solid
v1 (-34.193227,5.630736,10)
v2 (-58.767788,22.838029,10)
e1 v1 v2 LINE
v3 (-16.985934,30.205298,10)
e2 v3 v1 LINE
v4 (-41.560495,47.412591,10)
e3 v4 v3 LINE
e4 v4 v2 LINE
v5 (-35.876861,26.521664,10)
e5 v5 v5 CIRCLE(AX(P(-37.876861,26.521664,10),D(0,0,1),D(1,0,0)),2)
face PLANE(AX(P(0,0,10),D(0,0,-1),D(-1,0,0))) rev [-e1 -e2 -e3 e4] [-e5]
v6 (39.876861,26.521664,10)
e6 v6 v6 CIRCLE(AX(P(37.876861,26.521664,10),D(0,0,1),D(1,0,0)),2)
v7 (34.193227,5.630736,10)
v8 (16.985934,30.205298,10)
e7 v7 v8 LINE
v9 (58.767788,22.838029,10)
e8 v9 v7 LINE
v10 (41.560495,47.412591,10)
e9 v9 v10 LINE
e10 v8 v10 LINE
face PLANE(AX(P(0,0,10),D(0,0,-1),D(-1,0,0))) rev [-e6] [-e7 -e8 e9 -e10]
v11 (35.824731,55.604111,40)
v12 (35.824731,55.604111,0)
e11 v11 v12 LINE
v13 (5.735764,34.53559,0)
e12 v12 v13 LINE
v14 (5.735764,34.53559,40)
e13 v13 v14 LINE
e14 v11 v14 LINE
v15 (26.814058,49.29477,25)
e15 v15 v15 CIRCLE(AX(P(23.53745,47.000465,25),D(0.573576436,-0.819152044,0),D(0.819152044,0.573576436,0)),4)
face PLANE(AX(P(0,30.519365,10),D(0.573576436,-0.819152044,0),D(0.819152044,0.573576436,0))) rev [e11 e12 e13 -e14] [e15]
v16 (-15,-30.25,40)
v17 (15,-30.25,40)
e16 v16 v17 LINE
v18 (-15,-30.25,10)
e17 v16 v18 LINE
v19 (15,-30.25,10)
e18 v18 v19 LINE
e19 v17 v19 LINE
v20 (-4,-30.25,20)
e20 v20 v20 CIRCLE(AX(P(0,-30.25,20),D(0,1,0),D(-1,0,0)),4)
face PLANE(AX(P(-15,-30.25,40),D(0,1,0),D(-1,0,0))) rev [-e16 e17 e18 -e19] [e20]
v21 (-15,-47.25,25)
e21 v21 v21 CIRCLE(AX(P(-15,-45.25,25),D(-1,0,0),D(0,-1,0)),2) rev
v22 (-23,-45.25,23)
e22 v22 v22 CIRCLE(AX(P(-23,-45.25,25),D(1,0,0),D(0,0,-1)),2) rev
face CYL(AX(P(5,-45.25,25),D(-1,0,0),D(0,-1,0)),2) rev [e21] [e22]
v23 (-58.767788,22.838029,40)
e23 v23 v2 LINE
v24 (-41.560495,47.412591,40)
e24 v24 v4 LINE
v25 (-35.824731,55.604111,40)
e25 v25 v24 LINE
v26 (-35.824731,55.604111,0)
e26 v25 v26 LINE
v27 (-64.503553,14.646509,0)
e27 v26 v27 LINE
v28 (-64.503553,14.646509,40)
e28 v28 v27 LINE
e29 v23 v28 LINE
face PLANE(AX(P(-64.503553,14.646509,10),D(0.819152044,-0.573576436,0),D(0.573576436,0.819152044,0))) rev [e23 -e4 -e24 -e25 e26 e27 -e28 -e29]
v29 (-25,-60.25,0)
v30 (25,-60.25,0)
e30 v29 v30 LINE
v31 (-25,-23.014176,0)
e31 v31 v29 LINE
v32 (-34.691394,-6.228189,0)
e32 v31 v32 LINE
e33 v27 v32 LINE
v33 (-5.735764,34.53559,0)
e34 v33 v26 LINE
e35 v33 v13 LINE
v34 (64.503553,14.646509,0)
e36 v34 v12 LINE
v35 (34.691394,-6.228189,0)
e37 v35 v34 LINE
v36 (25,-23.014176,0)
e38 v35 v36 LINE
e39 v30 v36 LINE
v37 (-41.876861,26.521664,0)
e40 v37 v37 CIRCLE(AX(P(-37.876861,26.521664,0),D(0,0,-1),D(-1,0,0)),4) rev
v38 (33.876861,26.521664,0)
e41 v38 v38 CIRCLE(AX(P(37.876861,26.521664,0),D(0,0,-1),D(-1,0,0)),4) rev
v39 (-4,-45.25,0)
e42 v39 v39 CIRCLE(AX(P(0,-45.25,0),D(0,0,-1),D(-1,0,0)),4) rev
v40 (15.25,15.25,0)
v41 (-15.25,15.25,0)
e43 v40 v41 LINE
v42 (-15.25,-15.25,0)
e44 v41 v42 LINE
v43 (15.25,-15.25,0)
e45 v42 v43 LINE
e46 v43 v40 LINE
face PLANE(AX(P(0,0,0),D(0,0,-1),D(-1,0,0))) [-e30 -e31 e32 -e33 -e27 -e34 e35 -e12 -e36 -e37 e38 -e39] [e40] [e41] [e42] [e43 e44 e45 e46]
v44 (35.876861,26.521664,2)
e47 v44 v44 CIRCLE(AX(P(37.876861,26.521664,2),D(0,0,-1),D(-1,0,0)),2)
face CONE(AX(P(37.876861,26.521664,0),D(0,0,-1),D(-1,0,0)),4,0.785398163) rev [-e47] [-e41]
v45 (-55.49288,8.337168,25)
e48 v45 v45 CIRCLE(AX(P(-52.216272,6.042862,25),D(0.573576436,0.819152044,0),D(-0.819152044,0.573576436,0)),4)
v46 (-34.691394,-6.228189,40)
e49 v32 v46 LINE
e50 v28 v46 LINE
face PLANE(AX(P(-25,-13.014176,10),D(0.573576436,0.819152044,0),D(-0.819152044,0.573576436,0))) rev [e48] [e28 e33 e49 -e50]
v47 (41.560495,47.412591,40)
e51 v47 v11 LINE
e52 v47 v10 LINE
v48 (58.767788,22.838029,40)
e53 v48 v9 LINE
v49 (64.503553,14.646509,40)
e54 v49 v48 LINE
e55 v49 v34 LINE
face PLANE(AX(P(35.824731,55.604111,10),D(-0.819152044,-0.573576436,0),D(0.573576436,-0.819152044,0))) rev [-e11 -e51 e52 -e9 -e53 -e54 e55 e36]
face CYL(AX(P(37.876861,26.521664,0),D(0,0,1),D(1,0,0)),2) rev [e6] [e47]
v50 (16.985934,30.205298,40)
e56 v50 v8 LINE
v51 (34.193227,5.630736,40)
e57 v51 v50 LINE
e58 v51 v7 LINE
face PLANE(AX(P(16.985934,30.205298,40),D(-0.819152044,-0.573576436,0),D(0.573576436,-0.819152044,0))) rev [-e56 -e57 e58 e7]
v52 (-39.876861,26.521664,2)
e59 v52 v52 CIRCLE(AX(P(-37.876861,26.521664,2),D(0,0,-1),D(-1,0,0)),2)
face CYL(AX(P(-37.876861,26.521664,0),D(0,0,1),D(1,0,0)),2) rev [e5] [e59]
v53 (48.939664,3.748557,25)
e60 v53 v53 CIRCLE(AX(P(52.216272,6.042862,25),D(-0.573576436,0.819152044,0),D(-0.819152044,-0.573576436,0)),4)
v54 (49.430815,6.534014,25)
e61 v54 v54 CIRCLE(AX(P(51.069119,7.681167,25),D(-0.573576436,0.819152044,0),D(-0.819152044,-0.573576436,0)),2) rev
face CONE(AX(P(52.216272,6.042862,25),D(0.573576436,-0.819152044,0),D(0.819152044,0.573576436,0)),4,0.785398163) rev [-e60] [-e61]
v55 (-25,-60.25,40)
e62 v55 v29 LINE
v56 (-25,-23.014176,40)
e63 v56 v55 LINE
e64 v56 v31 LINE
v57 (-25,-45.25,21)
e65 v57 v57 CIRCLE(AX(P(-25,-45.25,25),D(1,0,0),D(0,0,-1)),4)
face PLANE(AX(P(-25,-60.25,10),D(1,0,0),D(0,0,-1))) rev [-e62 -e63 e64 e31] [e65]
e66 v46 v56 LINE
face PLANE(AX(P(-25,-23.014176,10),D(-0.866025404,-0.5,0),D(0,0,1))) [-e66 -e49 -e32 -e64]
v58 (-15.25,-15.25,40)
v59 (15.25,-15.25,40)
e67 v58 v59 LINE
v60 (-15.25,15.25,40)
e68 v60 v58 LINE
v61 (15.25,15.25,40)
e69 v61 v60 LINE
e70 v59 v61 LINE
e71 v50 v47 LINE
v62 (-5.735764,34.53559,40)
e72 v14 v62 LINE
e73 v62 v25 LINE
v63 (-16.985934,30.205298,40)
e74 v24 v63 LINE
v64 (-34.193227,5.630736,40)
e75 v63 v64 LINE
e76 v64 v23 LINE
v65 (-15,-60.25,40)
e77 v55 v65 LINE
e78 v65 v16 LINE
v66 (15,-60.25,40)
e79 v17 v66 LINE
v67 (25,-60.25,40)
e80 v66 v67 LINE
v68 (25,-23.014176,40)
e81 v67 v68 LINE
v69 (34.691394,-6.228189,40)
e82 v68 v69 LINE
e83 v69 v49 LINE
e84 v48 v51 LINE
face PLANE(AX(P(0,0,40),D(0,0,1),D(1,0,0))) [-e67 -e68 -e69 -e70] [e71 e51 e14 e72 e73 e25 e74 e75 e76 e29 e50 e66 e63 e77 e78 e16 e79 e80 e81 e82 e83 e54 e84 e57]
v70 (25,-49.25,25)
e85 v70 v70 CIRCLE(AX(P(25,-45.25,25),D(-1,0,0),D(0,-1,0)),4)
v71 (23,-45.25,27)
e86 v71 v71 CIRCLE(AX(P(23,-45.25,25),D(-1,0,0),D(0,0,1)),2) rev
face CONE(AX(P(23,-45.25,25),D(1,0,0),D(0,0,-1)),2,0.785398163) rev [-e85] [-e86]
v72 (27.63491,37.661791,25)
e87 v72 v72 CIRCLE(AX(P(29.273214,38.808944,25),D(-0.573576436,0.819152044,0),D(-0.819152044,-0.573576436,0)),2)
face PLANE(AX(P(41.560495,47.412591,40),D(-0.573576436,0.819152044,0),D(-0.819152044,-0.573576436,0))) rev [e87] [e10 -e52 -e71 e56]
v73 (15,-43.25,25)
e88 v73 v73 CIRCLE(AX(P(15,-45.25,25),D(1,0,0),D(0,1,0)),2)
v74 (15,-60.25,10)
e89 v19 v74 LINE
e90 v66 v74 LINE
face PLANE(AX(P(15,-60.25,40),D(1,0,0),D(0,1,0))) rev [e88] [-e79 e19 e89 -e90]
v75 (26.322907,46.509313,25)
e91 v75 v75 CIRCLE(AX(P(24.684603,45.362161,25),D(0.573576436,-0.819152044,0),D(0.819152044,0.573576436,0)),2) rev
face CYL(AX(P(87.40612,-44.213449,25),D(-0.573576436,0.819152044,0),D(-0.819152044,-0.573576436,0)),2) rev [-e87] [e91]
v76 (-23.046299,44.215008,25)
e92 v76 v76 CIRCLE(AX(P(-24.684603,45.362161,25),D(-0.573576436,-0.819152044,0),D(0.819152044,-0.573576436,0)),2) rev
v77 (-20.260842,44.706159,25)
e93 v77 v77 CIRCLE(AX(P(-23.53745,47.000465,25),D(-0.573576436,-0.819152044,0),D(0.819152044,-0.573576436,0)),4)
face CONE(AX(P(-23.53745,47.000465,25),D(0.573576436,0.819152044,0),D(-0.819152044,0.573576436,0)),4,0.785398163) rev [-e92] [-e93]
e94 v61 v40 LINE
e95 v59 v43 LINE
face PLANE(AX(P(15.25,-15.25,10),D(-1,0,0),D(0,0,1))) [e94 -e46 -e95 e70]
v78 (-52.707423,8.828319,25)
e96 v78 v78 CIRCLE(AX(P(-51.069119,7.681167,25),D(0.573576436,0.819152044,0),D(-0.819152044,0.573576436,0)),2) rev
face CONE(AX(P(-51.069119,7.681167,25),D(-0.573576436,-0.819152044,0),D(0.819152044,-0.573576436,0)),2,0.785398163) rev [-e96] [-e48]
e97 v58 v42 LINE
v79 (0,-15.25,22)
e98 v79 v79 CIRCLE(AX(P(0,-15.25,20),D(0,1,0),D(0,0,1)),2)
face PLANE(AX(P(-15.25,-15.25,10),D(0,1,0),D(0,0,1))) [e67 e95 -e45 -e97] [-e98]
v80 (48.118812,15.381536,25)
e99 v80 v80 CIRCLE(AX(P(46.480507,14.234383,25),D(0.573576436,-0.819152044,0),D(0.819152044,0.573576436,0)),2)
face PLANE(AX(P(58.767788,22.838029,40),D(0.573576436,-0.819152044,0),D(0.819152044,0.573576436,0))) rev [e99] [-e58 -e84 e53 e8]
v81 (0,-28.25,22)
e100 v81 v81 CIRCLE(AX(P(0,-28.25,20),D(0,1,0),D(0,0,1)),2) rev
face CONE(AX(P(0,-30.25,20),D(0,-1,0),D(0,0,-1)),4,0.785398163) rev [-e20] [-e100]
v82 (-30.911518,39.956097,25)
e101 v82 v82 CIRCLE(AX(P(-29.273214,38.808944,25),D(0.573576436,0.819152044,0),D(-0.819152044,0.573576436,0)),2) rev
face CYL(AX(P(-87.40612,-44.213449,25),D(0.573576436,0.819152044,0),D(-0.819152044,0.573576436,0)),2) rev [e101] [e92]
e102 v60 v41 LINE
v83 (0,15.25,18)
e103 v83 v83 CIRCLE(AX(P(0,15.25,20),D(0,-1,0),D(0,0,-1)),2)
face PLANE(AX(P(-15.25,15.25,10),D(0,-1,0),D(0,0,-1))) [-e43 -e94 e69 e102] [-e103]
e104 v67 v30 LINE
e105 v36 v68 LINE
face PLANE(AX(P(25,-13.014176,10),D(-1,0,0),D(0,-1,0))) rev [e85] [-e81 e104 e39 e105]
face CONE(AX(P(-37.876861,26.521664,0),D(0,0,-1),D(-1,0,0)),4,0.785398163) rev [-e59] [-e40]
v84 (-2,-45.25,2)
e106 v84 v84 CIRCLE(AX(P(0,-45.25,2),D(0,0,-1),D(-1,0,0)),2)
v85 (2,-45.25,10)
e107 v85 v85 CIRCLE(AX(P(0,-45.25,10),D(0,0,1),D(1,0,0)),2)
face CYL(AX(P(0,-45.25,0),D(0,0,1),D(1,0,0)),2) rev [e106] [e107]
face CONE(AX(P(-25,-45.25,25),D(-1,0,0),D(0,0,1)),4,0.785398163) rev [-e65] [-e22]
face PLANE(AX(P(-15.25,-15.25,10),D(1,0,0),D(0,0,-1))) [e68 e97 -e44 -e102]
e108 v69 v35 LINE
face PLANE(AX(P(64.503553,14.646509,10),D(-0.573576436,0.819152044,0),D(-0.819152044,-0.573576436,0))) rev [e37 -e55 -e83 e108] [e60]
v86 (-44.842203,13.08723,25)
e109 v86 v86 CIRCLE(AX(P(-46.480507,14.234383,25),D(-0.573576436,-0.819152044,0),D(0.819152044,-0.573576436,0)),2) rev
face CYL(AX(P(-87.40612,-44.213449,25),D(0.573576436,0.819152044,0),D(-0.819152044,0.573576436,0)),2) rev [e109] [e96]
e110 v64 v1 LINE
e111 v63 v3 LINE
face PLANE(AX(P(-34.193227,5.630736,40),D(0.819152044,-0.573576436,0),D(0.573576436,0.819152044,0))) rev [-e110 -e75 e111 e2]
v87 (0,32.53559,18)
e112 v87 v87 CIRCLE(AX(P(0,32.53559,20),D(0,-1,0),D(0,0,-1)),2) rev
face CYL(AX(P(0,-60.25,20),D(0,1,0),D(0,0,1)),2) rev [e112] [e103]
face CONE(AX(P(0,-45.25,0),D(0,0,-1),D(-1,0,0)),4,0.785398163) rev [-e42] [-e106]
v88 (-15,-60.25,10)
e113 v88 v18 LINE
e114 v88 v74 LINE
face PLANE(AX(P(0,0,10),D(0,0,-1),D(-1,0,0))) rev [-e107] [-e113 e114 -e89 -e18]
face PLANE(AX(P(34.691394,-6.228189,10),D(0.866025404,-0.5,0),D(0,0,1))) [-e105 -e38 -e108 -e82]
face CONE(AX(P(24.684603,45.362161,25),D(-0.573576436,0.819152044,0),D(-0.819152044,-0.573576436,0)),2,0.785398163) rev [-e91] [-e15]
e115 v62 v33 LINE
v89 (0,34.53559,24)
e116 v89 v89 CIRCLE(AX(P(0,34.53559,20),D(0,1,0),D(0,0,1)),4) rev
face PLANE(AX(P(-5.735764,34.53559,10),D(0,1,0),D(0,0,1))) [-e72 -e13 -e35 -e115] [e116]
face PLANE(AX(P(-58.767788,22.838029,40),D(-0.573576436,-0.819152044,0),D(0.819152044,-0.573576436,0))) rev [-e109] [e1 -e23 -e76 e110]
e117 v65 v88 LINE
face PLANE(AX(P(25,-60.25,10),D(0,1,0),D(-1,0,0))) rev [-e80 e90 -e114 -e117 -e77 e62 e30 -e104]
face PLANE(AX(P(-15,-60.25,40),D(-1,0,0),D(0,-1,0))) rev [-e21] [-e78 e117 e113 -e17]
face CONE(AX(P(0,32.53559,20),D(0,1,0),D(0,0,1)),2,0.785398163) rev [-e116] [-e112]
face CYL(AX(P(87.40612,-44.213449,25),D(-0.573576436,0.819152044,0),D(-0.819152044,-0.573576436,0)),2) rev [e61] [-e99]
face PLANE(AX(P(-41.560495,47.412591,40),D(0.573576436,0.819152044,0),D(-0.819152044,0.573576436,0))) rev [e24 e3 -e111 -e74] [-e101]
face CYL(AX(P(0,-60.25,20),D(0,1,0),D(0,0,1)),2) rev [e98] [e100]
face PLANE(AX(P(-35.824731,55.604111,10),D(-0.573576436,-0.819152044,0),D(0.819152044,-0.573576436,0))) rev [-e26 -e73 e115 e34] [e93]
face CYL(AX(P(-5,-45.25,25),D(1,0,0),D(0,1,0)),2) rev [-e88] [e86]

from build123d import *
from OCP.BRepFilletAPI import BRepFilletAPI_MakeChamfer

# Parameters (mm, degrees)
SKETCH1_W           = 30.5
SKETCH1_H           = 30.5
BOSS_EXTRUDE1_DEPTH = 10
SKETCH2_W           = 30.5
SKETCH2_H           = 30.5
BOSS_EXTRUDE2_DEPTH = 30
CHAMFER1_SIZE       = 10
CHAMFER1_SIZE2      = 11.831007916
SKETCH3_R           = 2
CUT_EXTRUDE1_DEPTH  = 94.224303623
SKETCH4_R           = 2
CUT_EXTRUDE2_DEPTH  = 120.721978802
SKETCH5_R           = 2
CUT_EXTRUDE3_DEPTH  = 30
SKETCH6_R           = 2
CUT_EXTRUDE4_DEPTH  = 122.429059078
CHAMFER3_SIZE       = 2


with BuildPart() as part:
    # Sketch1 → Boss-Extrude1 (new body)
    with BuildSketch(Plane.XY):
        Polygon((-25, -60.25), (-25, -13.014176264), (-64.503552507, 14.646508987), (-35.824730689, 55.604111202), (0, 30.519364719), (35.824730689, 55.604111202), (64.503552507, 14.646508987), (25, -13.014176264), (25, -60.25), align=None)
        Rectangle(SKETCH1_W, SKETCH1_H, mode=Mode.SUBTRACT)
    extrude(amount=BOSS_EXTRUDE1_DEPTH)

    # Sketch2 → Boss-Extrude2 (add)
    with BuildSketch(Plane.XY.offset(10)):
        Polygon((-58.767788143, 22.83802943), (-34.193226815, 5.63073634), (-16.985933724, 30.205297668), (-41.560495053, 47.412590759), (-35.824730689, 55.604111202), (0, 30.519364719), (35.824730689, 55.604111202), (41.560495053, 47.412590759), (16.985933724, 30.205297668), (34.193226815, 5.63073634), (58.767788143, 22.83802943), (64.503552507, 14.646508987), (25, -13.014176264), (25, -60.25), (15, -60.25), (15, -30.25), (-15, -30.25), (-15, -60.25), (-25, -60.25), (-25, -13.014176264), (-64.503552507, 14.646508987), align=None)
        Rectangle(SKETCH2_W, SKETCH2_H, mode=Mode.SUBTRACT)
    extrude(amount=BOSS_EXTRUDE2_DEPTH)

    # Chamfer1: one chamfer whose edges measure the first distance from different faces: ONE call of the kernel's chamfer builder (chamfer() names one face for all edges)
    chamfer1_edges_1 = [part.edges().sort_by_distance(p)[0] for p in [
        (-25, -13.014176264, 20),
    ]]
    chamfer1_side_1 = [part.faces().sort_by_distance(p)[0] for p in [
        (-25, -36.632088132, 20),
    ]]
    chamfer1_edges_2 = [part.edges().sort_by_distance(p)[0] for p in [
        (25, -13.014176264, 20),
    ]]
    chamfer1_side_2 = [part.faces().sort_by_distance(p)[0] for p in [
        (25, -36.632088132, 20),
    ]]
    chamfer1 = BRepFilletAPI_MakeChamfer(part.part.solid().wrapped)
    for e in chamfer1_edges_1:
        chamfer1.Add(CHAMFER1_SIZE, CHAMFER1_SIZE2, e.wrapped, chamfer1_side_1[0].wrapped)  # the first distance lies on this face
    for e in chamfer1_edges_2:
        chamfer1.Add(CHAMFER1_SIZE, CHAMFER1_SIZE2, e.wrapped, chamfer1_side_2[0].wrapped)  # the first distance lies on this face
    add(Compound.cast(chamfer1.Shape()), mode=Mode.REPLACE)

    # Chamfer2
    # the kernel refuses this chamfer: 10 mm, written as the material it adds along each edge
    with BuildSketch(Plane(origin=(0, 30.519364719, 40), x_dir=(0.8366959699781049, 0.5476676490558834, 0), z_dir=(0, 0, -1))) as chamfer2_piece_1:
        with BuildLine():
            Line((7.333326063, 0), (-2.934212568, -6.720719288))
            Line((-2.934212568, -6.720719288), (-3.119919002, -6.646468897))
            ThreePointArc((-3.119919002, -6.646468897), (-1.546295883, -3.328697528), (-0.185706433, 0.074250391))
            Line((-0.185706433, 0.074250391), (0.006257204, 0.199902095))
            ThreePointArc((0.006257204, 0.199902095), (3.669331251, 0.085242964), (7.339583267, 0.199902095))
            Line((7.339583267, 0.199902095), (7.333326063, 0))
        make_face()
    extrude(amount=40)

    # Sketch3 → Cut-Extrude1 (cut, through all)
    with BuildSketch(Plane.XY.offset(10)):
        with Locations((37.876860934, 26.521663549)):
            Circle(SKETCH3_R)
        with Locations((0, -45.25)):
            Circle(SKETCH3_R)
        with Locations((-37.876860934, 26.521663549)):
            Circle(SKETCH3_R)
    extrude(amount=-CUT_EXTRUDE1_DEPTH, mode=Mode.SUBTRACT)

    # Sketch4 → Cut-Extrude2 (cut, through all)
    with BuildSketch(Plane(origin=(-14.339410909, 20.478801107, 0), x_dir=(0.819152044288991, 0.5735764363510474, 0), z_dir=(-0.5735764363510474, 0.819152044288991, 0))):
        with Locations(Location((46.23910933, -25, 0), (0, 0, 180))):
            Circle(SKETCH4_R)
    cut_extrude2 = extrude(amount=-CUT_EXTRUDE2_DEPTH, mode=Mode.SUBTRACT)

    # Sketch5 → Cut-Extrude3 (cut)
    with BuildSketch(Plane(origin=(25, 0, 0), x_dir=(0, 0, -1), z_dir=(1, 0, 0))):
        with Locations(Location((-25, -45.25, 0), (0, 0, 90))):
            Circle(SKETCH5_R)
    cut_extrude3 = extrude(amount=-CUT_EXTRUDE3_DEPTH, mode=Mode.SUBTRACT)

    # Mirror1: Cut-Extrude2, Cut-Extrude3 across plane
    add(cut_extrude2.mirror(Plane(origin=(0, 0, 0), x_dir=(0, 0, 1), z_dir=(1, 0, 0))), mode=Mode.SUBTRACT)
    add(cut_extrude3.mirror(Plane(origin=(0, 0, 0), x_dir=(0, 0, 1), z_dir=(1, 0, 0))), mode=Mode.SUBTRACT)

    # Sketch6 → Cut-Extrude4 (cut, through all)
    with BuildSketch(Plane(origin=(0, 34.535590164, 0), x_dir=(1, 0, 0), z_dir=(0, 1, 0))):
        with Locations(Location((0, -20, 0), (0, 0, 270))):
            Circle(SKETCH6_R)
    extrude(amount=-CUT_EXTRUDE4_DEPTH, mode=Mode.SUBTRACT)

    # Chamfer3
    chamfer3_edges = [part.edges().sort_by_distance(p)[0] for p in [
        (35.876860934, 26.521663549, 0),
        (-2, -45.25, 0),
        (-39.876860934, 26.521663549, 0),
        (53.854575931, 7.190015315, 25),
        (25.175754113, 48.147617529, 25),
        (25, -47.25, 25),
        (-25.175754113, 48.147617529, 25),
        (-53.854575931, 7.190015315, 25),
        (-25, -47.25, 25),
        (0, -30.25, 18),
        (0, 34.535590164, 18),
    ]]
    chamfer(chamfer3_edges, length=CHAMFER3_SIZE)


solid = part.part
